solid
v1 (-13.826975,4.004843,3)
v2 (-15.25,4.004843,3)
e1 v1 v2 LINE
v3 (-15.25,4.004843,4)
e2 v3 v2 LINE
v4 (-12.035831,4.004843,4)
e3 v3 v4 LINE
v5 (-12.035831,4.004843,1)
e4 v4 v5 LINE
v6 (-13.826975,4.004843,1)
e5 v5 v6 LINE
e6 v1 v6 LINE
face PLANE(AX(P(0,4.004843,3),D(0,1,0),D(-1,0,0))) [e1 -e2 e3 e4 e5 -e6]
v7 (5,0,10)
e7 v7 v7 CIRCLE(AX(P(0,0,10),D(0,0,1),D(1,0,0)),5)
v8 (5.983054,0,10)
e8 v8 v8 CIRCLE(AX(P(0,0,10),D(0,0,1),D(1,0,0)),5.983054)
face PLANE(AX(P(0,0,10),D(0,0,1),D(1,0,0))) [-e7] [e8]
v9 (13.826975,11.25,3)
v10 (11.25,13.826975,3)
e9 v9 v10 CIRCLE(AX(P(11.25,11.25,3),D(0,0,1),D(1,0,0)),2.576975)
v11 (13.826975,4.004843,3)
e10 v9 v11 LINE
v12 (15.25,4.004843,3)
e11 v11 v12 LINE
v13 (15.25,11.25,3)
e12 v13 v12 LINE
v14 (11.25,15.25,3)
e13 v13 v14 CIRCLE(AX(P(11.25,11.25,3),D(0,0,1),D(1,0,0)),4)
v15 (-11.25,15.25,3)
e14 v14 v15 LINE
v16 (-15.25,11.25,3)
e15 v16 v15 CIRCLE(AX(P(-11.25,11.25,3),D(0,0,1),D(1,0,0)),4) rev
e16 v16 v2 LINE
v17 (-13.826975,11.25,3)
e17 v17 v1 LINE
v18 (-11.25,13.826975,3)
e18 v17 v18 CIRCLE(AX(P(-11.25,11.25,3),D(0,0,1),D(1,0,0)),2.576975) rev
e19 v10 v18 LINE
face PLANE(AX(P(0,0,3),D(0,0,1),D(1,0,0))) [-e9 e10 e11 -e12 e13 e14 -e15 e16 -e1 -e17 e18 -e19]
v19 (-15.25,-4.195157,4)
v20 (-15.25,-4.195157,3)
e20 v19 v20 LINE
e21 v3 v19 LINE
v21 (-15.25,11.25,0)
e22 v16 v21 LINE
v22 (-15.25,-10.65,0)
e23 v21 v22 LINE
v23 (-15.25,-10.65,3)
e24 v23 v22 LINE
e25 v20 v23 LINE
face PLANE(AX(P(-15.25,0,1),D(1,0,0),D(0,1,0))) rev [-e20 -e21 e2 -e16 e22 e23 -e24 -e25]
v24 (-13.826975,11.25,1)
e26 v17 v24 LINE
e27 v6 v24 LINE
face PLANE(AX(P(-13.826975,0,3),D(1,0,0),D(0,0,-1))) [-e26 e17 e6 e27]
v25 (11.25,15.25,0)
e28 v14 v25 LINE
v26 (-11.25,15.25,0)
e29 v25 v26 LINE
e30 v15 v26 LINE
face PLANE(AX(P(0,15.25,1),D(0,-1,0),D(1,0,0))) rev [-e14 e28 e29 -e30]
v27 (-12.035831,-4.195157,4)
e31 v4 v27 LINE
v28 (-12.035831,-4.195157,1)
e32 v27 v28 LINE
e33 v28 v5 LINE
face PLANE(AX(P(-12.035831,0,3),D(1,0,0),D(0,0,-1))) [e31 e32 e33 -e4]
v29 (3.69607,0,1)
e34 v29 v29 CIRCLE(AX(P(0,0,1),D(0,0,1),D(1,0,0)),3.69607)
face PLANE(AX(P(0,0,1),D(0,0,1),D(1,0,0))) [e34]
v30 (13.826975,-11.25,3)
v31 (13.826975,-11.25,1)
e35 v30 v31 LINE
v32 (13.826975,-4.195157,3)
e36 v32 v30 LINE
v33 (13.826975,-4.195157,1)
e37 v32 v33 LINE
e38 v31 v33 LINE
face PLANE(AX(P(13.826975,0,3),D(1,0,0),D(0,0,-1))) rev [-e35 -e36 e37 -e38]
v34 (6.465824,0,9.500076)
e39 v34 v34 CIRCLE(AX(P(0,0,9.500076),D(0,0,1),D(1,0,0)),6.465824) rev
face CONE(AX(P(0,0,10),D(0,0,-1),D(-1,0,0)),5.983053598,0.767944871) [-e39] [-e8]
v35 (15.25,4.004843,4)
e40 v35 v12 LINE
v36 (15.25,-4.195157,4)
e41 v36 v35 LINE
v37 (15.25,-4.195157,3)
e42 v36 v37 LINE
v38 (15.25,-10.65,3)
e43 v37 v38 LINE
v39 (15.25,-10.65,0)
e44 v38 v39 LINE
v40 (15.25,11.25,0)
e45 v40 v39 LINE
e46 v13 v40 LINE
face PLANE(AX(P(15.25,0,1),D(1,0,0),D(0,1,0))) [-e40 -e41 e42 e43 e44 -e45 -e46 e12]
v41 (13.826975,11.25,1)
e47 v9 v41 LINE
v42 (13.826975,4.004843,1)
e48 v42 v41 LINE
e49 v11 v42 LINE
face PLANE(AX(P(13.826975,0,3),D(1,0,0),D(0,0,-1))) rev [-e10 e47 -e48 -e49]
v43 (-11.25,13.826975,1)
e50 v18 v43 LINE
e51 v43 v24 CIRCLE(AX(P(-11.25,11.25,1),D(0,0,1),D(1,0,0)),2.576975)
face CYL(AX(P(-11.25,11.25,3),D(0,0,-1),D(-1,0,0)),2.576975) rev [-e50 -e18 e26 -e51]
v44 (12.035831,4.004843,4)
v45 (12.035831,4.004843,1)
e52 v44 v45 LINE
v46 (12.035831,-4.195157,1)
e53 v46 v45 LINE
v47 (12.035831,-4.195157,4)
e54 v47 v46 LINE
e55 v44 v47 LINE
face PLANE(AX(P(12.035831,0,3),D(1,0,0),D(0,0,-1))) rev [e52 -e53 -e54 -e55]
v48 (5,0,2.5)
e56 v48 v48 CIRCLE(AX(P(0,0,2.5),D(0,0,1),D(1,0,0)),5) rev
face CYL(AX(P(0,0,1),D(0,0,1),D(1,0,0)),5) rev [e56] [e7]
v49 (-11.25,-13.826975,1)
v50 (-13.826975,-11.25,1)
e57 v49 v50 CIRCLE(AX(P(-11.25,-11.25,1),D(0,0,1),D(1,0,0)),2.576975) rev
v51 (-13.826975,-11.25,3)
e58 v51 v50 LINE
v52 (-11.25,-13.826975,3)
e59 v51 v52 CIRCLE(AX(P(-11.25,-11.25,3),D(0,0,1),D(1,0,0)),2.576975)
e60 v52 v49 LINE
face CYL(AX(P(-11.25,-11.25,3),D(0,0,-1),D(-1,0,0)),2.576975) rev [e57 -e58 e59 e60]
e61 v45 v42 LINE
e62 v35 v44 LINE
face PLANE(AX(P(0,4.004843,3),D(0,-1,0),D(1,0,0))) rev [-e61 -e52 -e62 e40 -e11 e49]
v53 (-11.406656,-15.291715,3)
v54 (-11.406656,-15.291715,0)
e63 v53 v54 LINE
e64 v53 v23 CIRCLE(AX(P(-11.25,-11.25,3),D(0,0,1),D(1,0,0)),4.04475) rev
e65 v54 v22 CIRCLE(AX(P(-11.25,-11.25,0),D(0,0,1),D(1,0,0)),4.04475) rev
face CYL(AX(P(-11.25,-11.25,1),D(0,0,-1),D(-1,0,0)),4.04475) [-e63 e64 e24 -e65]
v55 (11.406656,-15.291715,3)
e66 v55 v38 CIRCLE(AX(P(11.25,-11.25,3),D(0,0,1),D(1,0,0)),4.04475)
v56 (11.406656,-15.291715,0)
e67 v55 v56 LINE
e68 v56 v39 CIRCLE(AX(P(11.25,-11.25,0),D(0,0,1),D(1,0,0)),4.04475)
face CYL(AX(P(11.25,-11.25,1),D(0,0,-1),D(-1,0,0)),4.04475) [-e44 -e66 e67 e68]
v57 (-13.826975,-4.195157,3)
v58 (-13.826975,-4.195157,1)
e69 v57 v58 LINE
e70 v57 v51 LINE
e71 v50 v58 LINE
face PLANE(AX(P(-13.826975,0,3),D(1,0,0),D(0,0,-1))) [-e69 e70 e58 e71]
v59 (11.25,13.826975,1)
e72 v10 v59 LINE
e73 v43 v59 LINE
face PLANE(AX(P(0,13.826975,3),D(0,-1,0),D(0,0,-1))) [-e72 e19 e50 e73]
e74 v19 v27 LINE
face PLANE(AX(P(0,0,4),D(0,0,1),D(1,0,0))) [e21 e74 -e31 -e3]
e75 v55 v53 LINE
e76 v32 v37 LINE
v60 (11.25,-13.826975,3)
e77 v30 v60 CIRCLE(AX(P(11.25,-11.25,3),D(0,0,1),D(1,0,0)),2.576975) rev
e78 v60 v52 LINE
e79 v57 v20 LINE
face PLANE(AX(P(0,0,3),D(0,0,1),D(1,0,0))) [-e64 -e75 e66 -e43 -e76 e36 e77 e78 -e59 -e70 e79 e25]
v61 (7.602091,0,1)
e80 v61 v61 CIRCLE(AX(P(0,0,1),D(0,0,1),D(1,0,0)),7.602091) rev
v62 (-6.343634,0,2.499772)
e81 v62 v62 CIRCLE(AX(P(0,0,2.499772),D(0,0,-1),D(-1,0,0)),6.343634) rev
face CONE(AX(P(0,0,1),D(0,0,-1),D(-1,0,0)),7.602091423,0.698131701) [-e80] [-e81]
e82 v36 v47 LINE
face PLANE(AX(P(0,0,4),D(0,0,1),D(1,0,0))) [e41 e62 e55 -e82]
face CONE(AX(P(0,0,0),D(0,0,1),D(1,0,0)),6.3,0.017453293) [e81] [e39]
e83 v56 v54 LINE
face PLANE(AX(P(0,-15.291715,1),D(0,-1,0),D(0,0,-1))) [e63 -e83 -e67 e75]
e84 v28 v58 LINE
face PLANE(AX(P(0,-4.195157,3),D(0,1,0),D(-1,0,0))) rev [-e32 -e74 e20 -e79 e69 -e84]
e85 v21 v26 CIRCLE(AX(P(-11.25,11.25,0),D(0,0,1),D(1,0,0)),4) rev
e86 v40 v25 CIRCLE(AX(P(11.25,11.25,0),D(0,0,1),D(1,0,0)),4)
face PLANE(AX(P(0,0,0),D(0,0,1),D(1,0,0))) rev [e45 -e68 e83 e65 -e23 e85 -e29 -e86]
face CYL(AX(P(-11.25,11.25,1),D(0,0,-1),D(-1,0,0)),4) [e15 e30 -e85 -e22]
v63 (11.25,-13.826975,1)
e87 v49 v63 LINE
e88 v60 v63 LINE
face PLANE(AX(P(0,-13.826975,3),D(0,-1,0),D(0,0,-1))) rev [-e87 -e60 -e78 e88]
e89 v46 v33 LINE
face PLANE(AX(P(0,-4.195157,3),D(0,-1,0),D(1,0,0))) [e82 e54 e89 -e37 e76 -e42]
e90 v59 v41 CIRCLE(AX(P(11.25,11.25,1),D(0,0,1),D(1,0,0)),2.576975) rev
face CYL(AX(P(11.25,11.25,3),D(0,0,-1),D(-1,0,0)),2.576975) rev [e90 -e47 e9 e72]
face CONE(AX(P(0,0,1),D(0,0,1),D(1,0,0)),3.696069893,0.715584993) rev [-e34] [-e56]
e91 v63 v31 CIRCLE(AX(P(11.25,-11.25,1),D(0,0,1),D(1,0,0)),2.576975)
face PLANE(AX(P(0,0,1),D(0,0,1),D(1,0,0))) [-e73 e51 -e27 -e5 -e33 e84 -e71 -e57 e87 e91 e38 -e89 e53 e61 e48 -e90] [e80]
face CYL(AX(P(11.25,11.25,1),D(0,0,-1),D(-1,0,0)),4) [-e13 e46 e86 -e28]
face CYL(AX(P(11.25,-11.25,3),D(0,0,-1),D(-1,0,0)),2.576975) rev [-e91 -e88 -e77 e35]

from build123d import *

# Parameters (mm, degrees)
EXTRUDE_1_DEPTH     = 1
EXTRUDE_2_DEPTH     = 3
SKETCH_1_4_R        = 6.3
EXTRUDE_3_DEPTH     = 10
EXTRUDE_3_DRAFT     = -1
SKETCH_1_5_W        = 1.42302488
SKETCH_1_5_H        = 8.2
SKETCH_1_5_W_2      = 1.791144373
EXTRUDE_4_DEPTH     = 4
CHAMFER_1_SIZE      = 0.5
CHAMFER_1_SIZE2     = 0.491497051
SKETCH_2_R          = 5
CUT_EXTRUDE_1_DEPTH = 9
CHAMFER_2_SIZE      = 1.5
CHAMFER_2_SIZE_2    = 1.284636358
CHAMFER_2_SIZE_3    = 1.303930107


# Read off the part's stored shape, not the designer's step: Бобышка-Вытянуть1
with BuildPart() as part:
    # Бобышка-Вытянуть1 outline → Бобышка-Вытянуть1 (new body)
    with BuildSketch(Plane.XY):
        with BuildLine():
            Line((-15.25, 11.25), (-15.25, -10.65))
            ThreePointArc((-15.25, -10.65), (-14.365417418, -13.829568629), (-11.406655615, -15.291714861))
            Line((-11.406655615, -15.291714861), (11.406655615, -15.291714861))
            ThreePointArc((11.406655615, -15.291714861), (14.365417418, -13.829568629), (15.25, -10.65))
            Line((15.25, -10.65), (15.25, 11.25))
            ThreePointArc((15.25, 11.25), (14.078427125, 14.078427125), (11.25, 15.25))
            Line((11.25, 15.25), (-11.25, 15.25))
            ThreePointArc((-11.25, 15.25), (-14.078427125, 14.078427125), (-15.25, 11.25))
        make_face()
    extrude(amount=EXTRUDE_1_DEPTH)

    # Эскиз1<3> → Бобышка-Вытянуть2 (add)
    with BuildSketch(Plane.XY):
        with BuildLine():
            ThreePointArc((-11.25, 15.25), (-14.078427125, 14.078427125), (-15.25, 11.25))
            Line((-15.25, 11.25), (-15.25, -10.65))
            ThreePointArc((-15.25, -10.65), (-14.365417418, -13.829568629), (-11.406655615, -15.291714861))
            Line((-11.406655615, -15.291714861), (11.406655615, -15.291714861))
            ThreePointArc((11.406655615, -15.291714861), (14.365417418, -13.829568629), (15.25, -10.65))
            Line((15.25, -10.65), (15.25, 11.25))
            ThreePointArc((15.25, 11.25), (14.078427125, 14.078427125), (11.25, 15.25))
            Line((11.25, 15.25), (-11.25, 15.25))
        make_face()
        with BuildLine():
            ThreePointArc((13.82697512, -11.25), (13.072196582, -13.072196582), (11.25, -13.82697512))
            Line((11.25, -13.82697512), (-11.25, -13.82697512))
            ThreePointArc((-11.25, -13.82697512), (-13.072196582, -13.072196582), (-13.82697512, -11.25))
            Line((-13.82697512, -11.25), (-13.82697512, -4.195156857))
            Line((-13.82697512, -4.195156857), (-12.035830747, -4.195156857))
            Line((-12.035830747, -4.195156857), (-12.035830747, 4.004843143))
            Line((-12.035830747, 4.004843143), (-13.82697512, 4.004843143))
            Line((-13.82697512, 4.004843143), (-13.82697512, 11.25))
            ThreePointArc((-13.82697512, 11.25), (-13.072196582, 13.072196582), (-11.25, 13.82697512))
            Line((-11.25, 13.82697512), (11.25, 13.82697512))
            ThreePointArc((11.25, 13.82697512), (13.072196582, 13.072196582), (13.82697512, 11.25))
            Line((13.82697512, 11.25), (13.82697512, 4.004843143))
            Line((13.82697512, 4.004843143), (12.035830747, 4.004843143))
            Line((12.035830747, 4.004843143), (12.035830747, -4.195156857))
            Line((12.035830747, -4.195156857), (13.82697512, -4.195156857))
            Line((13.82697512, -4.195156857), (13.82697512, -11.25))
        make_face(mode=Mode.SUBTRACT)
    extrude(amount=EXTRUDE_2_DEPTH)


with BuildPart() as extrude_3_tool:
    # Эскиз1<4> → Бобышка-Вытянуть3 (with draft: the straight prism first)
    with BuildSketch(Plane.XY):
        Circle(SKETCH_1_4_R)
    extrude(amount=EXTRUDE_3_DEPTH)
    # Бобышка-Вытянуть3: the draft: its side faces are tilted about the plane it starts from
    extrude_3_sides = [extrude_3_tool.faces().sort_by_distance(p)[0] for p in [
        (-6.3, 0, 5),
    ]]
    draft(extrude_3_sides, Plane.XY, EXTRUDE_3_DRAFT)


with BuildPart() as part_1:
    add(part.part)

    # Бобышка-Вытянуть3: add extrude_3_tool
    add(extrude_3_tool.part)

    # Эскиз1<5> → Бобышка-Вытянуть4 (add)
    with BuildSketch(Plane.XY):
        with Locations((-14.53848756, -0.095156857)):
            Rectangle(SKETCH_1_5_W, SKETCH_1_5_H)
        with Locations((-12.931402933, -0.095156857)):
            Rectangle(SKETCH_1_5_W_2, SKETCH_1_5_H)
        with Locations((12.931402933, -0.095156857)):
            Rectangle(SKETCH_1_5_W_2, SKETCH_1_5_H)
        with Locations((14.53848756, -0.095156857)):
            Rectangle(SKETCH_1_5_W, SKETCH_1_5_H)
    extrude(amount=EXTRUDE_4_DEPTH)

    # Фаска1
    chamfer_1_edges = [part_1.edges().sort_by_distance(p)[0] for p in [
        (-6.474550649, 0, 10),
    ]]
    chamfer_1_side = [part_1.faces().sort_by_distance(p)[0] for p in [
        (-6.396002857, 0, 5.5),
    ]]
    chamfer(chamfer_1_edges, length=CHAMFER_1_SIZE, length2=CHAMFER_1_SIZE2, reference=chamfer_1_side[0])

    # Эскиз2 → Вырез-Вытянуть1 (cut)
    with BuildSketch(Plane.XY.offset(10)):
        Circle(SKETCH_2_R)
    extrude(amount=-CUT_EXTRUDE_1_DEPTH, mode=Mode.SUBTRACT)

    # Фаска2
    # the kernel refuses this chamfer: 1.5, 1.303930107, 1.284636358 mm, written as the material it adds along each edge
    with BuildSketch(Plane(origin=(0, 0, 1), x_dir=(1, 0, 0), z_dir=(0, 1, 0))) as chamfer_2_piece_1:
        Polygon((6.317455065 + CHAMFER_2_SIZE * 0.0174524064373, -CHAMFER_2_SIZE * 0.999847695156), (6.317455065 + CHAMFER_2_SIZE_2, 0), (6.317455065, 0), align=None)
    revolve(axis=Axis((0, 0, 1), (0, 0, -1)))
    with BuildSketch(Plane(origin=(0, 0, 1), x_dir=(1, 0, 0), z_dir=(0, -1, 0))) as chamfer_2_piece_2:
        Polygon((5, CHAMFER_2_SIZE), (5 - CHAMFER_2_SIZE_3, 0), (5, 0), align=None)
    revolve(axis=Axis((0, 0, 1), (0, 0, 1)))


solid = part_1.part
